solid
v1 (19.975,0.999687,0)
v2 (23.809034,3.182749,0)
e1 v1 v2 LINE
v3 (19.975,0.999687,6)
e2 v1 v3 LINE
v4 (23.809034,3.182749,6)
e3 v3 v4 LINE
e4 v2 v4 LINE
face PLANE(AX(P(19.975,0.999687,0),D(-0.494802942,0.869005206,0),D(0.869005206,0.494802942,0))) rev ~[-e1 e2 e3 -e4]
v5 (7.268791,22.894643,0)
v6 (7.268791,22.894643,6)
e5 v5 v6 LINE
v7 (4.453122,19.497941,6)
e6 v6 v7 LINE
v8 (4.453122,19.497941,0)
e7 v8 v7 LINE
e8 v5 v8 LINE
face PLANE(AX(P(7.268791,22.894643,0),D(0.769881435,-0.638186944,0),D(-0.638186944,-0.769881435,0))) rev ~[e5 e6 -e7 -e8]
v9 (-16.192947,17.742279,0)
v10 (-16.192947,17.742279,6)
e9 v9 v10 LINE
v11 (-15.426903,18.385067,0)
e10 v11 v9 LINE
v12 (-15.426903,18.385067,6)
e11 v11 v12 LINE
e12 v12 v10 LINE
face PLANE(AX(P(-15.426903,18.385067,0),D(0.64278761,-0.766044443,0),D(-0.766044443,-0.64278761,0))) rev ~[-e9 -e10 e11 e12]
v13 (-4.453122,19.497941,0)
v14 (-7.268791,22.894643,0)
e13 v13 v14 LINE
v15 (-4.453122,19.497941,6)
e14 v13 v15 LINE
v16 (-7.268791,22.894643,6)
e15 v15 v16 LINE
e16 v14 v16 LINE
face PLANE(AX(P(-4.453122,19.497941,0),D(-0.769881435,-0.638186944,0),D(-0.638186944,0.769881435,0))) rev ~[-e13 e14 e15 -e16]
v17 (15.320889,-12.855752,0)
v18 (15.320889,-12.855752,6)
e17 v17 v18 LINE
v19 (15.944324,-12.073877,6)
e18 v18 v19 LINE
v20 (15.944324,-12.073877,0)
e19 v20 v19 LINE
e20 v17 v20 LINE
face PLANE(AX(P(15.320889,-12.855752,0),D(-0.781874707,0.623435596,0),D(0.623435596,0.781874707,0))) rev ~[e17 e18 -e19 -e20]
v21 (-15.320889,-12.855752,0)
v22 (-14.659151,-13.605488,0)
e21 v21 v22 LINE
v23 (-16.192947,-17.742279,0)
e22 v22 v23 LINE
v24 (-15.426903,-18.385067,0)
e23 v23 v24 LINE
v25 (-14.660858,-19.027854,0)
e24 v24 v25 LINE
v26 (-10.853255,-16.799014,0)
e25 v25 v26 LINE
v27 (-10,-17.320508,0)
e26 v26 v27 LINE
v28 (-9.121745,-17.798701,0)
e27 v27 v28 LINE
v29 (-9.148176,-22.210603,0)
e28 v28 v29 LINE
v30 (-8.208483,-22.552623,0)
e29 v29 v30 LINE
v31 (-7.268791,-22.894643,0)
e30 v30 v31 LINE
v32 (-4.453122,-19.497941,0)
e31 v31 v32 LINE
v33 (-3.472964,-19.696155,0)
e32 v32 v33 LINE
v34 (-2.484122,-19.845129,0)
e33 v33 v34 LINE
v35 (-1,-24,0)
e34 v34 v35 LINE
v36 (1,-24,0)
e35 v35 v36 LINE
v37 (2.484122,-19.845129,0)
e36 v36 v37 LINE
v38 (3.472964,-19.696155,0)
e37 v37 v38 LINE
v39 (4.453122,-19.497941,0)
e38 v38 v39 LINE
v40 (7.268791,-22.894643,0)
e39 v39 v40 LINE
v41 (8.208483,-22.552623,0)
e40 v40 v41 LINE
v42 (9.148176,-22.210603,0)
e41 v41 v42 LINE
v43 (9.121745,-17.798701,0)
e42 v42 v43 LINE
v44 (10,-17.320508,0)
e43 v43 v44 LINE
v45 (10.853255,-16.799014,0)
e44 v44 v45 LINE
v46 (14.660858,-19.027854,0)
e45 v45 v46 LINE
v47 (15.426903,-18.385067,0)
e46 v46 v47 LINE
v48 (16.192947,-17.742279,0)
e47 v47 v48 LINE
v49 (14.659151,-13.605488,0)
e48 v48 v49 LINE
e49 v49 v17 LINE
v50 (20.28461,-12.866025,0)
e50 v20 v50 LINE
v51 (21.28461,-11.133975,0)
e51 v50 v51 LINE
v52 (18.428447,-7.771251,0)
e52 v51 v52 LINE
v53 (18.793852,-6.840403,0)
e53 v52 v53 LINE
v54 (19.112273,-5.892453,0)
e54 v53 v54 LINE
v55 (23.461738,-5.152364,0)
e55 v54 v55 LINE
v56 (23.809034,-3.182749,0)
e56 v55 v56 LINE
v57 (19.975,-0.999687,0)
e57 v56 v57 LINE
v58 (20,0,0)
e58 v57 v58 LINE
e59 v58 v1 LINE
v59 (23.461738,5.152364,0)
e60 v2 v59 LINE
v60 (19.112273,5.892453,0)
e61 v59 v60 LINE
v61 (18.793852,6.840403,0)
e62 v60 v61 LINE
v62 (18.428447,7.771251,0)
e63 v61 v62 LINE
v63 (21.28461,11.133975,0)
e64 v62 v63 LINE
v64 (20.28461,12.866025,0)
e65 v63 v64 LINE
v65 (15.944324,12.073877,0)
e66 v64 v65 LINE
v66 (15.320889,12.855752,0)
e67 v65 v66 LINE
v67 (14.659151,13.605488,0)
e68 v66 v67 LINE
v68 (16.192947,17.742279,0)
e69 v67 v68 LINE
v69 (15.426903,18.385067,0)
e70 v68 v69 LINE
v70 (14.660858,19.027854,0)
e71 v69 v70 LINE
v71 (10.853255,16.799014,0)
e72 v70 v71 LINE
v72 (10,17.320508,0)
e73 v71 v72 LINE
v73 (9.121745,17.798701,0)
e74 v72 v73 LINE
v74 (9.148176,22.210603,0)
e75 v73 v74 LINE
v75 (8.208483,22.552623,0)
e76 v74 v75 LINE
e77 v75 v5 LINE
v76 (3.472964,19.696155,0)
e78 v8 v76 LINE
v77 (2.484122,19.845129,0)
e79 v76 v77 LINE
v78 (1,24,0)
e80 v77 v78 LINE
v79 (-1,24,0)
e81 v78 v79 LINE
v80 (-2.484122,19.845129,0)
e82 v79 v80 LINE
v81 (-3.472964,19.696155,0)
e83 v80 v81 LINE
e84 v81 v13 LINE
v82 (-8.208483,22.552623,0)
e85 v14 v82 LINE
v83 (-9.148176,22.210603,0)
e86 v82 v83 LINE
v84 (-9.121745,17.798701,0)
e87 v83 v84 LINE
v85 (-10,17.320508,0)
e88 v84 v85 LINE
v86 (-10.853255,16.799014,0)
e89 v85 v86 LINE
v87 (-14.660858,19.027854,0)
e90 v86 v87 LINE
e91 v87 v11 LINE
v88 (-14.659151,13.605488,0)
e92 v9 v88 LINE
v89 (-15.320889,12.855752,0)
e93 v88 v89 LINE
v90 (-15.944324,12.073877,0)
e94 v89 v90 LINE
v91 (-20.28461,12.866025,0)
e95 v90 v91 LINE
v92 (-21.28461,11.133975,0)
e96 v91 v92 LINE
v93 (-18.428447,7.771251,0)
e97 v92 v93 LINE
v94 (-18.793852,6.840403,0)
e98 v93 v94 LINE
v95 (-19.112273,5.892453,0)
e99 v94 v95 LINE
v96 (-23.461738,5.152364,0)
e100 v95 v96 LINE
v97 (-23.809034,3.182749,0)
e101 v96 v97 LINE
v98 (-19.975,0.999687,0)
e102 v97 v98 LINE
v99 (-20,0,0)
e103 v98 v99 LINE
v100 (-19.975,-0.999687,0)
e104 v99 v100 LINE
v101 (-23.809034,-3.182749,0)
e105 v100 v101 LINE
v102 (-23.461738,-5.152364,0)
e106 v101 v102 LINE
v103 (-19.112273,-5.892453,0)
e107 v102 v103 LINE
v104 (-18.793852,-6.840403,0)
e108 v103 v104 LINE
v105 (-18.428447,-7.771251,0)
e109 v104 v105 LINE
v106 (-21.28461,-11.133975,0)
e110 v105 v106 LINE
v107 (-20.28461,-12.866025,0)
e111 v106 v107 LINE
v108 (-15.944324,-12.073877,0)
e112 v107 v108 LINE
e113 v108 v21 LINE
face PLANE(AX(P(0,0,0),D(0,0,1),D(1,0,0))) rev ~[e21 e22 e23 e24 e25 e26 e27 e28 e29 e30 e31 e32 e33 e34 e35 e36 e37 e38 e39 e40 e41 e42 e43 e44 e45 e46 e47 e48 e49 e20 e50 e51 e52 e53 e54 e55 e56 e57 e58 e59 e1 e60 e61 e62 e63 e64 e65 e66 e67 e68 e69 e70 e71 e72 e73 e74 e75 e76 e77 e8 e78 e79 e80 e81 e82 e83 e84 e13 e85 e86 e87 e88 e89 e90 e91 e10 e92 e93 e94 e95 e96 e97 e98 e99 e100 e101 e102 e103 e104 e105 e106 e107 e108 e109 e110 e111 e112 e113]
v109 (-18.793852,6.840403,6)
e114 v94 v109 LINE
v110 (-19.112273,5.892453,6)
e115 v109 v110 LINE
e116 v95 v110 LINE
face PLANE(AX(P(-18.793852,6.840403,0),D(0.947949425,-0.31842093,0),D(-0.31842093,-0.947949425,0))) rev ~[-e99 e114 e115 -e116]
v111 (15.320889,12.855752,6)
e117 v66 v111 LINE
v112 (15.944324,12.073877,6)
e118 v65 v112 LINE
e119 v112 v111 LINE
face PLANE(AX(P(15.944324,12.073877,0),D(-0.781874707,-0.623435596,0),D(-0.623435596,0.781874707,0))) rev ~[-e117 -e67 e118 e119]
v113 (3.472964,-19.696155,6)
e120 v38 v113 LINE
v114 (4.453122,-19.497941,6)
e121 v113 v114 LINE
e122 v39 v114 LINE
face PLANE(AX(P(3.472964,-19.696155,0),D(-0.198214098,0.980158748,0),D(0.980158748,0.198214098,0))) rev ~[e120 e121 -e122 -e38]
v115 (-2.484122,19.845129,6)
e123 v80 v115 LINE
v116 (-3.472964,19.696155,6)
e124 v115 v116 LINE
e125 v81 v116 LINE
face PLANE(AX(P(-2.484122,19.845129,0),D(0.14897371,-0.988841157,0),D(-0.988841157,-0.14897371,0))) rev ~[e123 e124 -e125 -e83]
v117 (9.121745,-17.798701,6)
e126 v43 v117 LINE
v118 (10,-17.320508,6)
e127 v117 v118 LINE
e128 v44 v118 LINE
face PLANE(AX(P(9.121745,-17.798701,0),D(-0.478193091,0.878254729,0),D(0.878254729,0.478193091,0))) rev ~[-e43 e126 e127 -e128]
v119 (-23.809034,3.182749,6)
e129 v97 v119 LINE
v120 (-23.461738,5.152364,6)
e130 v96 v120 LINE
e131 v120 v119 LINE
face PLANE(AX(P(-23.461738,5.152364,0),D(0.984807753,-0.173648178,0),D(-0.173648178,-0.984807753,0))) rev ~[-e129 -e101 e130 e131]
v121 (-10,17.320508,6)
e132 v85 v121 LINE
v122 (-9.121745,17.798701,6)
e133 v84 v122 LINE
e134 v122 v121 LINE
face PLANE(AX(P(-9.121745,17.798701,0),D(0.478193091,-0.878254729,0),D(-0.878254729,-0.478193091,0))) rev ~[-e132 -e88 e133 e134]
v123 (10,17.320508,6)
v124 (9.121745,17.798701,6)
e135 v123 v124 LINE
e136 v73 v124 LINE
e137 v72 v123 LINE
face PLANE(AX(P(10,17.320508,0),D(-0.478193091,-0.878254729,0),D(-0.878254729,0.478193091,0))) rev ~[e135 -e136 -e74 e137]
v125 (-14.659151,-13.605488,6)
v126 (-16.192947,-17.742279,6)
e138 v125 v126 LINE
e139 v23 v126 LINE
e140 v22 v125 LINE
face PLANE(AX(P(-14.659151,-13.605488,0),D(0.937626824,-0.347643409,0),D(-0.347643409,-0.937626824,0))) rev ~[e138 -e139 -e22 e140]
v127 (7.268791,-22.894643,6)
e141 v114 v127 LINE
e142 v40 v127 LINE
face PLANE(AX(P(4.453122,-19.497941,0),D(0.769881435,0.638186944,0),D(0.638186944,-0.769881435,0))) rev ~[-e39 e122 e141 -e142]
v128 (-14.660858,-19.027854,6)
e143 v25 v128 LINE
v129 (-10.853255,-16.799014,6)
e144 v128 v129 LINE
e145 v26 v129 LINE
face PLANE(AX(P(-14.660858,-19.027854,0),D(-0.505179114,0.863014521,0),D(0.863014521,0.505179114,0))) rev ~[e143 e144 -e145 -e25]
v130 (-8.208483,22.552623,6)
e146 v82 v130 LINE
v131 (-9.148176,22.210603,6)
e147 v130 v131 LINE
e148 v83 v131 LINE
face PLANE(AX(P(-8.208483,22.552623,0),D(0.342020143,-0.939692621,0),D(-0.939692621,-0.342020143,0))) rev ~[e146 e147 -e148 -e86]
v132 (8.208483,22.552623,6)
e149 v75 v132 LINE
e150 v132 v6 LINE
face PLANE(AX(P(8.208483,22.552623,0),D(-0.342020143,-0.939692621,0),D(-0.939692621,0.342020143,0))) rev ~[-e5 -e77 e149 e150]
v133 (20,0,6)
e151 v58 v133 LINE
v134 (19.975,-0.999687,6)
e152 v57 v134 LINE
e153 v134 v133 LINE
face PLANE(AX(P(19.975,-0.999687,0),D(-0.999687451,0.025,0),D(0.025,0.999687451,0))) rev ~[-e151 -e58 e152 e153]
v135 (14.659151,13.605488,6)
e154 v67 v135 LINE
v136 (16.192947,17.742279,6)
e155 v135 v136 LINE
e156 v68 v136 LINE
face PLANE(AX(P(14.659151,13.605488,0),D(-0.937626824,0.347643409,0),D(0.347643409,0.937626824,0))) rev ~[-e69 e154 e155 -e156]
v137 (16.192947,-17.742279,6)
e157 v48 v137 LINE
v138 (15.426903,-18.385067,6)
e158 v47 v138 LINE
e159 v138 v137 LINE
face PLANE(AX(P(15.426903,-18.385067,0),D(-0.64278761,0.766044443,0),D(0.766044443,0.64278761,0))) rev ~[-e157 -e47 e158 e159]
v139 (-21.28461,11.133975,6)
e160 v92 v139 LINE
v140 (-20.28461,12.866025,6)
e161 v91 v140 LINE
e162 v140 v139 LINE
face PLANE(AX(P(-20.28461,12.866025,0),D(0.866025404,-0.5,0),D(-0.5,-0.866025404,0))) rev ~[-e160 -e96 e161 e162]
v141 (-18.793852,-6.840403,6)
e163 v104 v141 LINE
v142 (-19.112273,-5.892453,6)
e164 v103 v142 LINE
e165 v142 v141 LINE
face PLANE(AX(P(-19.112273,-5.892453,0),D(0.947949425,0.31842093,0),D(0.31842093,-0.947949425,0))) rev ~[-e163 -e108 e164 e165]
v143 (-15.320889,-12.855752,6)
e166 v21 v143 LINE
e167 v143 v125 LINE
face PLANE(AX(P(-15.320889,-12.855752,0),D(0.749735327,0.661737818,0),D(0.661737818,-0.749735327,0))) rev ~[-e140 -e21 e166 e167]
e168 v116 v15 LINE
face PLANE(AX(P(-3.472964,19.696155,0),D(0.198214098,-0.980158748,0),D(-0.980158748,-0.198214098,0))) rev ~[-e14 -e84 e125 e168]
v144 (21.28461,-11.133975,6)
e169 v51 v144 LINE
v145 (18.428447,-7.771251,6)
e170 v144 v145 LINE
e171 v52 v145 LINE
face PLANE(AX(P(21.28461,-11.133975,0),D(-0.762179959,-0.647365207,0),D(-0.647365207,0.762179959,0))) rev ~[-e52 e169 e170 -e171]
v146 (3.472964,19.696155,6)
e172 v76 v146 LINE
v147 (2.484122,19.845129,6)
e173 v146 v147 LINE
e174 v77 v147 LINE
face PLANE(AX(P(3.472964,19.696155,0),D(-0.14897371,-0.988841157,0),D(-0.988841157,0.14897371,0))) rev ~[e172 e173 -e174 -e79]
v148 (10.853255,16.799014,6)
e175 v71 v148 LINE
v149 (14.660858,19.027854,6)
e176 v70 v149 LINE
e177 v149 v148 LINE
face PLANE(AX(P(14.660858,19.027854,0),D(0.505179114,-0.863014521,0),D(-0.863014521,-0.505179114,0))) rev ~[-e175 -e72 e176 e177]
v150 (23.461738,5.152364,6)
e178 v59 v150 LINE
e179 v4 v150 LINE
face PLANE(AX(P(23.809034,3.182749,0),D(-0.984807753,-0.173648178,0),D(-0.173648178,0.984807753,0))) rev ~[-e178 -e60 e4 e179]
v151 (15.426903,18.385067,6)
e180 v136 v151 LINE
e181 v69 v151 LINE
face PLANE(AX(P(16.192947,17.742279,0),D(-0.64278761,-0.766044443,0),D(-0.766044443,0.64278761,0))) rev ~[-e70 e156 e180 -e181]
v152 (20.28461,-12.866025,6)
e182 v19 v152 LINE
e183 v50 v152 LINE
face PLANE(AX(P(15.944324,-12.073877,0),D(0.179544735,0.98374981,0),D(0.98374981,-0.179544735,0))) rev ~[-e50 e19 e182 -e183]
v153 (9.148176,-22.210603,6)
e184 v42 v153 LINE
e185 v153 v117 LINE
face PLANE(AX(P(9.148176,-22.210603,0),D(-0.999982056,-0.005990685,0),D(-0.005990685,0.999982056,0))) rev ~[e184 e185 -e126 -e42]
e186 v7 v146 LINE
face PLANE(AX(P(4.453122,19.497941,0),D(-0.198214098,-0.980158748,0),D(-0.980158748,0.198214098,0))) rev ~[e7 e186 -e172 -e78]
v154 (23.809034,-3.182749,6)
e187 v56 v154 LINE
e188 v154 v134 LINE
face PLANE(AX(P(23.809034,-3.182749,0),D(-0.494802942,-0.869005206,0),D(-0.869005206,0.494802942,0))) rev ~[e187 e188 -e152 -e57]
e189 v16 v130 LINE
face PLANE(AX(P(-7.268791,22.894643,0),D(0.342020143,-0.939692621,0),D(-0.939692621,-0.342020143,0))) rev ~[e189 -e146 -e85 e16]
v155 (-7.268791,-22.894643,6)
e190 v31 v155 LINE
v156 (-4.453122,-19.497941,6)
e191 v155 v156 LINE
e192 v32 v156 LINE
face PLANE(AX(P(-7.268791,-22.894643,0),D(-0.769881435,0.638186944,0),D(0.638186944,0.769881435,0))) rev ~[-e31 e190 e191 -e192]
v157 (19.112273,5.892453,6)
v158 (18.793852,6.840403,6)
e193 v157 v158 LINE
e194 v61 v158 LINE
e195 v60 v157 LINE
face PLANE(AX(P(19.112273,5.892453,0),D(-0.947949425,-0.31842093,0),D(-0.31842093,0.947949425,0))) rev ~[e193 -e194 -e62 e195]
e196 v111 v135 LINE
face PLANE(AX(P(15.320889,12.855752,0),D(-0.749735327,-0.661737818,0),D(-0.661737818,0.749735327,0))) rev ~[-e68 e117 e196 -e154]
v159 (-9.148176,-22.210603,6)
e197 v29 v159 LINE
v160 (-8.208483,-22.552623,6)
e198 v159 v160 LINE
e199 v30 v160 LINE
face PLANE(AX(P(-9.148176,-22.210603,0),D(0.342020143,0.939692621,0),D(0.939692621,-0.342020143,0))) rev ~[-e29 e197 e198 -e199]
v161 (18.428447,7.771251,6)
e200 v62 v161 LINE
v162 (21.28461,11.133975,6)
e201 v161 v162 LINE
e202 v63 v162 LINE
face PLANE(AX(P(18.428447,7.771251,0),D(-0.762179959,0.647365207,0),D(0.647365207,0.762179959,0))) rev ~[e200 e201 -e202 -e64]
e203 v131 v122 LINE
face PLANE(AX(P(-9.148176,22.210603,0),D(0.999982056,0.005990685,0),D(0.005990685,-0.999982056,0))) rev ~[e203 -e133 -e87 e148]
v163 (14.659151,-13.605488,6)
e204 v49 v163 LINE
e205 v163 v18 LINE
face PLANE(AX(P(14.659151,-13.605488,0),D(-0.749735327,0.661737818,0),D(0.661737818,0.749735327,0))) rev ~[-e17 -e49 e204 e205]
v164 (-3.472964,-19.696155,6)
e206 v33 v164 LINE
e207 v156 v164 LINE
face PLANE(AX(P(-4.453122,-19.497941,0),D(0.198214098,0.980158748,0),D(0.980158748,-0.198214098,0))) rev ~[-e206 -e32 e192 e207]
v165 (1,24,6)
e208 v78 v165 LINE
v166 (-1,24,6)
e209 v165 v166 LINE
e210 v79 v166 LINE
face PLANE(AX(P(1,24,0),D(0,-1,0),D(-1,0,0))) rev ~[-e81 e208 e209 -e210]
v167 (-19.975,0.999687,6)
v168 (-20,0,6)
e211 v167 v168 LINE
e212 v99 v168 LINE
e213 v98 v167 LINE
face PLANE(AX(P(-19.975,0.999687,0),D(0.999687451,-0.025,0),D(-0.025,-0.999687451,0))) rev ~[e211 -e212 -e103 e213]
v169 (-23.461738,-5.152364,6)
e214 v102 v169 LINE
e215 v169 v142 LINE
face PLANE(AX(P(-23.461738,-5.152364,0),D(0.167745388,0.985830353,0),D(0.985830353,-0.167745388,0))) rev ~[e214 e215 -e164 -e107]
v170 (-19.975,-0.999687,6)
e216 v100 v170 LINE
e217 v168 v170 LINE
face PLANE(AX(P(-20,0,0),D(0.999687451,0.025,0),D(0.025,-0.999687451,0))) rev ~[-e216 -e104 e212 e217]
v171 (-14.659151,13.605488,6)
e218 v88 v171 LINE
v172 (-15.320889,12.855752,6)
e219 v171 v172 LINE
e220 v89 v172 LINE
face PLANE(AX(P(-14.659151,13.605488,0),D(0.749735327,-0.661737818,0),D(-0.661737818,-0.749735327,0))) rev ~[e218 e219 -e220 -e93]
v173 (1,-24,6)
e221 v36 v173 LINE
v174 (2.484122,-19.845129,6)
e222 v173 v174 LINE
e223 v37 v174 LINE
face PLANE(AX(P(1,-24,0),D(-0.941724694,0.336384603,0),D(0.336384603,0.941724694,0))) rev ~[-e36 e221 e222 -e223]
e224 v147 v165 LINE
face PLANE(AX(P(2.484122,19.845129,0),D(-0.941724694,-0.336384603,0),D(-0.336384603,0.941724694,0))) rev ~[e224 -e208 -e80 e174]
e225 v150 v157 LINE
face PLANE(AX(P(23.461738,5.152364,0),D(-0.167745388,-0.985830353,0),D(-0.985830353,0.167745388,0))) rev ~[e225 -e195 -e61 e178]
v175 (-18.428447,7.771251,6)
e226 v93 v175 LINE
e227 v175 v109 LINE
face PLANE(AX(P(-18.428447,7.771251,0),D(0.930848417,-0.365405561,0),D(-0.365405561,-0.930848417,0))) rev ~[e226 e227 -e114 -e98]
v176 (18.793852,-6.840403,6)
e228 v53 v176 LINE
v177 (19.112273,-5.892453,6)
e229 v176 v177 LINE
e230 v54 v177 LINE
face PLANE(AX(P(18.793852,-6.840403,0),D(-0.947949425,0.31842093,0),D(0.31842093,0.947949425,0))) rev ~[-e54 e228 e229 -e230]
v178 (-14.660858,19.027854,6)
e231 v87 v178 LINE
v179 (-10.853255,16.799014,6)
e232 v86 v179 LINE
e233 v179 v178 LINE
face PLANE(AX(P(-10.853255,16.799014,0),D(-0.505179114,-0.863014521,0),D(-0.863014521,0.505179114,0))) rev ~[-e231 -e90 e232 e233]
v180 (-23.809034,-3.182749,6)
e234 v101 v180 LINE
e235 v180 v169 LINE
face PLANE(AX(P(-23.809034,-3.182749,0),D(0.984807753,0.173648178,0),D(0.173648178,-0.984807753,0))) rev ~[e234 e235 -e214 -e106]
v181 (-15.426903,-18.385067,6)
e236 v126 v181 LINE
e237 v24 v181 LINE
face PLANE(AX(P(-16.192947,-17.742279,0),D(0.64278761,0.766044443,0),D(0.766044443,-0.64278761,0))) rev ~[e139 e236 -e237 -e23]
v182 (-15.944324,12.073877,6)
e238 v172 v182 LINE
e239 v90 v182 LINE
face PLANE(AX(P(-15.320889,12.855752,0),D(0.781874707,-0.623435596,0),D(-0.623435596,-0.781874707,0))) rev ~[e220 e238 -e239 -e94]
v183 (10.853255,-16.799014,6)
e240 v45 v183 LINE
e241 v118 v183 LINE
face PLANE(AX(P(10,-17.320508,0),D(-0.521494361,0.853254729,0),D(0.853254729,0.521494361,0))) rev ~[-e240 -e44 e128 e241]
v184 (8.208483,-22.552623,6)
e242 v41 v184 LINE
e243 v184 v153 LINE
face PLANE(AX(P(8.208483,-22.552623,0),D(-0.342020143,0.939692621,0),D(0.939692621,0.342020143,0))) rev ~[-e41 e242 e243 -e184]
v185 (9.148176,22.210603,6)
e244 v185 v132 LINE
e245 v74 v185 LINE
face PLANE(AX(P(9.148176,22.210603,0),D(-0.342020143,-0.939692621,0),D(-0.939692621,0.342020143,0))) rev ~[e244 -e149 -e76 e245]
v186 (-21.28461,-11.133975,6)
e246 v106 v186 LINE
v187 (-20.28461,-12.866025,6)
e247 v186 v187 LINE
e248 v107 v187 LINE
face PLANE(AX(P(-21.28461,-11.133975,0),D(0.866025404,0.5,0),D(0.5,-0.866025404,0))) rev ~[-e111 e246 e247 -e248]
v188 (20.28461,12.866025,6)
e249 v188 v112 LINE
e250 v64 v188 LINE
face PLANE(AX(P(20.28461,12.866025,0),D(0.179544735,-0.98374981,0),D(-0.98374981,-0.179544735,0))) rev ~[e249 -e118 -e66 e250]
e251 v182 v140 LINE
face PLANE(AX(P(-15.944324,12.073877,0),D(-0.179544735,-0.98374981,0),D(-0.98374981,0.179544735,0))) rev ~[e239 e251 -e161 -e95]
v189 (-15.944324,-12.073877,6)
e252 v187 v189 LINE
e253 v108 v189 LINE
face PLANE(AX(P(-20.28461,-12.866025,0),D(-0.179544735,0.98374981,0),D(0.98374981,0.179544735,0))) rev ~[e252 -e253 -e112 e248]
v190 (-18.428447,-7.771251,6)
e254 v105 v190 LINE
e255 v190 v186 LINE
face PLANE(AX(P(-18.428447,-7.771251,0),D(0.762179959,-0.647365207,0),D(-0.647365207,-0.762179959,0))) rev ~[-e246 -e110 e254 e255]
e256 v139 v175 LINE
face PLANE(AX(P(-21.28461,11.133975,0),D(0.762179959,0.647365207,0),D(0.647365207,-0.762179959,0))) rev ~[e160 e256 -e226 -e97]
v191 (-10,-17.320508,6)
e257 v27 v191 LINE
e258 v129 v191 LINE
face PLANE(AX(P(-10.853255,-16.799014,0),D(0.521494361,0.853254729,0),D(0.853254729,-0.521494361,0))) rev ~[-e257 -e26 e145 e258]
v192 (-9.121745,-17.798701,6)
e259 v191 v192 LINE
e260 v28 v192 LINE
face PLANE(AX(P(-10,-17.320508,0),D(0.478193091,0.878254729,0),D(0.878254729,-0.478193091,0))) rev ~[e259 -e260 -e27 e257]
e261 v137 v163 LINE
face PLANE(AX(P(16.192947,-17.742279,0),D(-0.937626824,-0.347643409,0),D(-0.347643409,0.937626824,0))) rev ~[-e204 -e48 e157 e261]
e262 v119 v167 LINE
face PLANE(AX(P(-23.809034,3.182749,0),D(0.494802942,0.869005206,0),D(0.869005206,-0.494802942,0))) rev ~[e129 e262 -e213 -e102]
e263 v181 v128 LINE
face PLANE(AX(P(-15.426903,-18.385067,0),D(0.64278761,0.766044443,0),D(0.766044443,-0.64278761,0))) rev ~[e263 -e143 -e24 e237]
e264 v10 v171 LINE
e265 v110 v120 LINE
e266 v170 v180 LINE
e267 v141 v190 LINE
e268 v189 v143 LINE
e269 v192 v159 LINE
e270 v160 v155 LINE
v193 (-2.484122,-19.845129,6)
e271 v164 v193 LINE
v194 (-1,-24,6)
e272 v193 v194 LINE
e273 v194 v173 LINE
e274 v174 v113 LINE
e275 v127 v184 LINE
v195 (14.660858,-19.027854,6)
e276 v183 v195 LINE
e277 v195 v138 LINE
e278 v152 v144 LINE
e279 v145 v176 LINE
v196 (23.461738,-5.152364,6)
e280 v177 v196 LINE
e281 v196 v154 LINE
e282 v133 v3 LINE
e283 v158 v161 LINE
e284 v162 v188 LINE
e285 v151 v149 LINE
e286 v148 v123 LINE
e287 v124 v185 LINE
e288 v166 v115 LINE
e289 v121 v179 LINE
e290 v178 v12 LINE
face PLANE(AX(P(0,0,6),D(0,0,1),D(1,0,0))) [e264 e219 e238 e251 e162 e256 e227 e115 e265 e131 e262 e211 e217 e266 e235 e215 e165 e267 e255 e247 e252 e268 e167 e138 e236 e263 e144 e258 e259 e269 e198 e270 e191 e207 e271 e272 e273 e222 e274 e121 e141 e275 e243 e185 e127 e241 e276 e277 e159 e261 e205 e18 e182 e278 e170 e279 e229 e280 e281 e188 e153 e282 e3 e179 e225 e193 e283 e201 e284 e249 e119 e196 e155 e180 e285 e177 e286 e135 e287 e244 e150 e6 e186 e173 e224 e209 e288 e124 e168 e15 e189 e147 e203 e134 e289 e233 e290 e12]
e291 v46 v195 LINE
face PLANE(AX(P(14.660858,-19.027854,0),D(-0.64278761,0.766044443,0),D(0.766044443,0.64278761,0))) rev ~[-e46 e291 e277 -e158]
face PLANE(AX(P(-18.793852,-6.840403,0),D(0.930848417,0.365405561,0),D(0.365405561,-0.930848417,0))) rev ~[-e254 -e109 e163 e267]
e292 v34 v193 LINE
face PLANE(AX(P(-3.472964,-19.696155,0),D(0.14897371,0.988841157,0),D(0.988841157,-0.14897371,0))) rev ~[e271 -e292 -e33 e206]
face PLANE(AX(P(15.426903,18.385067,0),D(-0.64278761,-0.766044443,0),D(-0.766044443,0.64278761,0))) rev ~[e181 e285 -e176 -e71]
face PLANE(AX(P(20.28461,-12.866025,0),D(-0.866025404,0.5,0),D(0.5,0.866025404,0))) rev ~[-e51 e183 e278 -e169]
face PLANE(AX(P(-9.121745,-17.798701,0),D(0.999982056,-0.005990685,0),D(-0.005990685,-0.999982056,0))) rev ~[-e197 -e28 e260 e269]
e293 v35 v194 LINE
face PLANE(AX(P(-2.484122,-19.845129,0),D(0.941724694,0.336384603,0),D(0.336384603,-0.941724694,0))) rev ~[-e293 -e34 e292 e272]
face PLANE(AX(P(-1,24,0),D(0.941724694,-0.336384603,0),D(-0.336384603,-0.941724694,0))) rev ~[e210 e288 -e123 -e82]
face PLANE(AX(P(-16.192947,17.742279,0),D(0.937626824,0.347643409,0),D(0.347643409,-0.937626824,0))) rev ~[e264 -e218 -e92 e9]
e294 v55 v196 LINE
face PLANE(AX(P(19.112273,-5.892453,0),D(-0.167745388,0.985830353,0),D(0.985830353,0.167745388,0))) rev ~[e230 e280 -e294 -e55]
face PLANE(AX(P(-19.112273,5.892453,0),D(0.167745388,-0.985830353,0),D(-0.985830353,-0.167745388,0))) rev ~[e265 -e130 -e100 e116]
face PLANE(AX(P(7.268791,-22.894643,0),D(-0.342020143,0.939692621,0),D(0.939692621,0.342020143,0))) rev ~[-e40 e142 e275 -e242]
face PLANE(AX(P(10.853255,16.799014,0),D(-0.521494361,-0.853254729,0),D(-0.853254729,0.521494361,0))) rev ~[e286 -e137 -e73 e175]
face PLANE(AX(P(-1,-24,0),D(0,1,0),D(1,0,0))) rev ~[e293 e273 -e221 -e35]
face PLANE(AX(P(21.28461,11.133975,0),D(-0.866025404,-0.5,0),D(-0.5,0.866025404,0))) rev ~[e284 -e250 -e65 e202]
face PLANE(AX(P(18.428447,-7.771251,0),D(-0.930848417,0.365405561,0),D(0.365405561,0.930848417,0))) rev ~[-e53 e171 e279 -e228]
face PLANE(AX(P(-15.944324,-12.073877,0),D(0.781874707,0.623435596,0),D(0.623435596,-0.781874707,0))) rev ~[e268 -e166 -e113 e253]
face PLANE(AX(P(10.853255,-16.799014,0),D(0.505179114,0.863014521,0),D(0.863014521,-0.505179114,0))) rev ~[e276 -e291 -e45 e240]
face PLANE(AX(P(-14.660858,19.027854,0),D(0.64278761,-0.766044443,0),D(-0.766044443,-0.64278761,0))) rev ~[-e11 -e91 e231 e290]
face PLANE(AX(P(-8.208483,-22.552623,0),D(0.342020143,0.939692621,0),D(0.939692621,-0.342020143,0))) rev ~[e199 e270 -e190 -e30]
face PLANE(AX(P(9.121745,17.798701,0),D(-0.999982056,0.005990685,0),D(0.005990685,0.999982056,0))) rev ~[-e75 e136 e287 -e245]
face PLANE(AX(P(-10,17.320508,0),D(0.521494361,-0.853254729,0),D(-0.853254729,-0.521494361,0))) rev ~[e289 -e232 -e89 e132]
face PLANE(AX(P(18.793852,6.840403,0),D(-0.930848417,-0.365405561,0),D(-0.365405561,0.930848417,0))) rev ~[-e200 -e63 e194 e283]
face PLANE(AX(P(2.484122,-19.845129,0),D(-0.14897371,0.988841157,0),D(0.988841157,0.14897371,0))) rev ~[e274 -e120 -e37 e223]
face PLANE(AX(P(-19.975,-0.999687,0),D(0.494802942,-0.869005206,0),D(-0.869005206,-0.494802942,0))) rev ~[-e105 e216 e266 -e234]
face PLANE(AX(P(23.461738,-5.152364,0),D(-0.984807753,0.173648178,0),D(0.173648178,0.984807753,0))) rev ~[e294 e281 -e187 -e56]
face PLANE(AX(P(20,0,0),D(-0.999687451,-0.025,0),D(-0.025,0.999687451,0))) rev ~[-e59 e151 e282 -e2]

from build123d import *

# Parameters (mm, degrees)
F1_DEPTH = 6


# Not quite as in the source:
# - a feature names something its author has since deleted; it is built from what else it names


with BuildPart() as f1:
    # F0 (on Top) → F1 (new body)
    with BuildSketch(Plane.XY):
        with BuildLine():
            Line((19.975, -0.9996874512), (20, 0))
            Line((20, 0), (19.975, 0.9996874512))
            ThreePointArc((19.975, 0.9996874512), (19.6961550602, 3.4729635533), (19.1122733455, 5.892453442))
            Line((19.1122733455, 5.892453442), (18.7938524157, 6.8404028665))
            Line((18.7938524157, 6.8404028665), (18.4284468549, 7.7712512839))
            ThreePointArc((18.4284468549, 7.7712512839), (17.3205080757, 10), (15.9443244585, 12.0738774867))
            Line((15.9443244585, 12.0738774867), (15.3208888624, 12.8557521937))
            Line((15.3208888624, 12.8557521937), (14.6591510441, 13.6054875203))
            ThreePointArc((14.6591510441, 13.6054875203), (12.8557521937, 15.3208888624), (10.8532547285, 16.799013715))
            Line((10.8532547285, 16.799013715), (10, 17.3205080757))
            Line((10, 17.3205080757), (9.1217452715, 17.7987011662))
            ThreePointArc((9.1217452715, 17.7987011662), (6.8404028665, 18.7938524157), (4.4531223014, 19.4979409623))
            Line((4.4531223014, 19.4979409623), (3.4729635533, 19.6961550602))
            Line((3.4729635533, 19.6961550602), (2.4841223964, 19.8451287705))
            ThreePointArc((2.4841223964, 19.8451287705), (0, 20), (-2.4841223964, 19.8451287705))
            Line((-2.4841223964, 19.8451287705), (-3.4729635533, 19.6961550602))
            Line((-3.4729635533, 19.6961550602), (-4.4531223014, 19.4979409623))
            ThreePointArc((-4.4531223014, 19.4979409623), (-6.8404028665, 18.7938524157), (-9.1217452715, 17.7987011662))
            Line((-9.1217452715, 17.7987011662), (-10, 17.3205080757))
            Line((-10, 17.3205080757), (-10.8532547285, 16.799013715))
            ThreePointArc((-10.8532547285, 16.799013715), (-12.8557521937, 15.3208888624), (-14.6591510441, 13.6054875203))
            Line((-14.6591510441, 13.6054875203), (-15.3208888624, 12.8557521937))
            Line((-15.3208888624, 12.8557521937), (-15.9443244585, 12.0738774867))
            ThreePointArc((-15.9443244585, 12.0738774867), (-17.3205080757, 10), (-18.4284468549, 7.7712512839))
            Line((-18.4284468549, 7.7712512839), (-18.7938524157, 6.8404028665))
            Line((-18.7938524157, 6.8404028665), (-19.1122733455, 5.892453442))
            ThreePointArc((-19.1122733455, 5.892453442), (-19.6961550602, 3.4729635533), (-19.975, 0.9996874512))
            Line((-19.975, 0.9996874512), (-20, 0))
            Line((-20, 0), (-19.975, -0.9996874512))
            ThreePointArc((-19.975, -0.9996874512), (-19.6961550602, -3.4729635533), (-19.1122733455, -5.892453442))
            Line((-19.1122733455, -5.892453442), (-18.7938524157, -6.8404028665))
            Line((-18.7938524157, -6.8404028665), (-18.4284468549, -7.7712512839))
            ThreePointArc((-18.4284468549, -7.7712512839), (-17.3205080757, -10), (-15.9443244585, -12.0738774867))
            Line((-15.9443244585, -12.0738774867), (-15.3208888624, -12.8557521937))
            Line((-15.3208888624, -12.8557521937), (-14.6591510441, -13.6054875203))
            ThreePointArc((-14.6591510441, -13.6054875203), (-12.8557521937, -15.3208888624), (-10.8532547285, -16.799013715))
            Line((-10.8532547285, -16.799013715), (-10, -17.3205080757))
            Line((-10, -17.3205080757), (-9.1217452715, -17.7987011662))
            ThreePointArc((-9.1217452715, -17.7987011662), (-6.8404028665, -18.7938524157), (-4.4531223014, -19.4979409623))
            Line((-4.4531223014, -19.4979409623), (-3.4729635533, -19.6961550602))
            Line((-3.4729635533, -19.6961550602), (-2.4841223964, -19.8451287705))
            ThreePointArc((-2.4841223964, -19.8451287705), (0, -20), (2.4841223964, -19.8451287705))
            Line((2.4841223964, -19.8451287705), (3.4729635533, -19.6961550602))
            Line((3.4729635533, -19.6961550602), (4.4531223014, -19.4979409623))
            ThreePointArc((4.4531223014, -19.4979409623), (6.8404028665, -18.7938524157), (9.1217452715, -17.7987011662))
            Line((9.1217452715, -17.7987011662), (10, -17.3205080757))
            Line((10, -17.3205080757), (10.8532547285, -16.799013715))
            ThreePointArc((10.8532547285, -16.799013715), (12.8557521937, -15.3208888624), (14.6591510441, -13.6054875203))
            Line((14.6591510441, -13.6054875203), (15.3208888624, -12.8557521937))
            Line((15.3208888624, -12.8557521937), (15.9443244585, -12.0738774867))
            ThreePointArc((15.9443244585, -12.0738774867), (17.3205080757, -10), (18.4284468549, -7.7712512839))
            Line((18.4284468549, -7.7712512839), (18.7938524157, -6.8404028665))
            Line((18.7938524157, -6.8404028665), (19.1122733455, -5.892453442))
            ThreePointArc((19.1122733455, -5.892453442), (19.6961550602, -3.4729635533), (19.975, -0.9996874512))
        make_face()
        with BuildLine():
            ThreePointArc((-2.4841223964, 19.8451287705), (0, 20), (2.4841223964, 19.8451287705))
            Line((2.4841223964, 19.8451287705), (1, 24))
            Line((1, 24), (0, 24))
            Line((0, 24), (-1, 24))
            Line((-1, 24), (-2.4841223964, 19.8451287705))
        make_face()
        with BuildLine():
            ThreePointArc((4.4531223014, 19.4979409623), (6.8404028665, 18.7938524157), (9.1217452715, 17.7987011662))
            Line((9.1217452715, 17.7987011662), (9.1481760606, 22.2106027555))
            Line((9.1481760606, 22.2106027555), (8.2084834398, 22.5526228989))
            Line((8.2084834398, 22.5526228989), (7.268790819, 22.8946430422))
            Line((7.268790819, 22.8946430422), (4.4531223014, 19.4979409623))
        make_face()
        with BuildLine():
            ThreePointArc((10.8532547285, 16.799013715), (12.8557521937, 15.3208888624), (14.6591510441, 13.6054875203))
            Line((14.6591510441, 13.6054875203), (16.1929470756, 17.7422790252))
            Line((16.1929470756, 17.7422790252), (15.4269026325, 18.3850666349))
            Line((15.4269026325, 18.3850666349), (14.6608581894, 19.0278542445))
            Line((14.6608581894, 19.0278542445), (10.8532547285, 16.799013715))
        make_face()
        with BuildLine():
            ThreePointArc((15.9443244585, 12.0738774867), (17.3205080757, 10), (18.4284468549, 7.7712512839))
            Line((18.4284468549, 7.7712512839), (21.2846096908, 11.1339745962))
            Line((21.2846096908, 11.1339745962), (20.7846096908, 12))
            Line((20.7846096908, 12), (20.2846096908, 12.8660254038))
            Line((20.2846096908, 12.8660254038), (15.9443244585, 12.0738774867))
        make_face()
        with BuildLine():
            ThreePointArc((19.1122733455, 5.892453442), (19.6961550602, 3.4729635533), (19.975, 0.9996874512))
            Line((19.975, 0.9996874512), (23.80903425, 3.182748511))
            Line((23.80903425, 3.182748511), (23.6353860723, 4.167556264))
            Line((23.6353860723, 4.167556264), (23.4617378946, 5.152364017))
            Line((23.4617378946, 5.152364017), (19.1122733455, 5.892453442))
        make_face()
        with BuildLine():
            Line((23.80903425, -3.182748511), (19.975, -0.9996874512))
            ThreePointArc((19.975, -0.9996874512), (19.6961550602, -3.4729635533), (19.1122733455, -5.892453442))
            Line((19.1122733455, -5.892453442), (23.4617378946, -5.152364017))
            Line((23.4617378946, -5.152364017), (23.6353860723, -4.167556264))
            Line((23.6353860723, -4.167556264), (23.80903425, -3.182748511))
        make_face()
        with BuildLine():
            Line((21.2846096908, -11.1339745962), (18.4284468549, -7.7712512839))
            ThreePointArc((18.4284468549, -7.7712512839), (17.3205080757, -10), (15.9443244585, -12.0738774867))
            Line((15.9443244585, -12.0738774867), (20.2846096908, -12.8660254038))
            Line((20.2846096908, -12.8660254038), (20.7846096908, -12))
            Line((20.7846096908, -12), (21.2846096908, -11.1339745962))
        make_face()
        with BuildLine():
            Line((16.1929470756, -17.7422790252), (14.6591510441, -13.6054875203))
            ThreePointArc((14.6591510441, -13.6054875203), (12.8557521937, -15.3208888624), (10.8532547285, -16.799013715))
            Line((10.8532547285, -16.799013715), (14.6608581894, -19.0278542445))
            Line((14.6608581894, -19.0278542445), (15.4269026325, -18.3850666349))
            Line((15.4269026325, -18.3850666349), (16.1929470756, -17.7422790252))
        make_face()
        with BuildLine():
            Line((9.1481760606, -22.2106027555), (9.1217452715, -17.7987011662))
            ThreePointArc((9.1217452715, -17.7987011662), (6.8404028665, -18.7938524157), (4.4531223014, -19.4979409623))
            Line((4.4531223014, -19.4979409623), (7.268790819, -22.8946430422))
            Line((7.268790819, -22.8946430422), (8.2084834398, -22.5526228989))
            Line((8.2084834398, -22.5526228989), (9.1481760606, -22.2106027555))
        make_face()
        with BuildLine():
            Line((1, -24), (2.4841223964, -19.8451287705))
            ThreePointArc((2.4841223964, -19.8451287705), (0, -20), (-2.4841223964, -19.8451287705))
            Line((-2.4841223964, -19.8451287705), (-1, -24))
            Line((-1, -24), (0, -24))
            Line((0, -24), (1, -24))
        make_face()
        with BuildLine():
            Line((-7.268790819, -22.8946430422), (-4.4531223014, -19.4979409623))
            ThreePointArc((-4.4531223014, -19.4979409623), (-6.8404028665, -18.7938524157), (-9.1217452715, -17.7987011662))
            Line((-9.1217452715, -17.7987011662), (-9.1481760606, -22.2106027555))
            Line((-9.1481760606, -22.2106027555), (-8.2084834398, -22.5526228989))
            Line((-8.2084834398, -22.5526228989), (-7.268790819, -22.8946430422))
        make_face()
        with BuildLine():
            Line((-14.6608581894, -19.0278542445), (-10.8532547285, -16.799013715))
            ThreePointArc((-10.8532547285, -16.799013715), (-12.8557521937, -15.3208888624), (-14.6591510441, -13.6054875203))
            Line((-14.6591510441, -13.6054875203), (-16.1929470756, -17.7422790252))
            Line((-16.1929470756, -17.7422790252), (-15.4269026325, -18.3850666349))
            Line((-15.4269026325, -18.3850666349), (-14.6608581894, -19.0278542445))
        make_face()
        with BuildLine():
            Line((-20.2846096908, -12.8660254038), (-15.9443244585, -12.0738774867))
            ThreePointArc((-15.9443244585, -12.0738774867), (-17.3205080757, -10), (-18.4284468549, -7.7712512839))
            Line((-18.4284468549, -7.7712512839), (-21.2846096908, -11.1339745962))
            Line((-21.2846096908, -11.1339745962), (-20.7846096908, -12))
            Line((-20.7846096908, -12), (-20.2846096908, -12.8660254038))
        make_face()
        with BuildLine():
            Line((-23.4617378946, -5.152364017), (-19.1122733455, -5.892453442))
            ThreePointArc((-19.1122733455, -5.892453442), (-19.6961550602, -3.4729635533), (-19.975, -0.9996874512))
            Line((-19.975, -0.9996874512), (-23.80903425, -3.182748511))
            Line((-23.80903425, -3.182748511), (-23.6353860723, -4.167556264))
            Line((-23.6353860723, -4.167556264), (-23.4617378946, -5.152364017))
        make_face()
        with BuildLine():
            ThreePointArc((-19.975, 0.9996874512), (-19.6961550602, 3.4729635533), (-19.1122733455, 5.892453442))
            Line((-19.1122733455, 5.892453442), (-23.4617378946, 5.152364017))
            Line((-23.4617378946, 5.152364017), (-23.6353860723, 4.167556264))
            Line((-23.6353860723, 4.167556264), (-23.80903425, 3.182748511))
            Line((-23.80903425, 3.182748511), (-19.975, 0.9996874512))
        make_face()
        with BuildLine():
            ThreePointArc((-18.4284468549, 7.7712512839), (-17.3205080757, 10), (-15.9443244585, 12.0738774867))
            Line((-15.9443244585, 12.0738774867), (-20.2846096908, 12.8660254038))
            Line((-20.2846096908, 12.8660254038), (-20.7846096908, 12))
            Line((-20.7846096908, 12), (-21.2846096908, 11.1339745962))
            Line((-21.2846096908, 11.1339745962), (-18.4284468549, 7.7712512839))
        make_face()
        with BuildLine():
            ThreePointArc((-14.6591510441, 13.6054875203), (-12.8557521937, 15.3208888624), (-10.8532547285, 16.799013715))
            Line((-10.8532547285, 16.799013715), (-14.6608581894, 19.0278542445))
            Line((-14.6608581894, 19.0278542445), (-15.4269026325, 18.3850666349))
            Line((-15.4269026325, 18.3850666349), (-16.1929470756, 17.7422790252))
            Line((-16.1929470756, 17.7422790252), (-14.6591510441, 13.6054875203))
        make_face()
        with BuildLine():
            ThreePointArc((-9.1217452715, 17.7987011662), (-6.8404028665, 18.7938524157), (-4.4531223014, 19.4979409623))
            Line((-4.4531223014, 19.4979409623), (-7.268790819, 22.8946430422))
            Line((-7.268790819, 22.8946430422), (-8.2084834398, 22.5526228989))
            Line((-8.2084834398, 22.5526228989), (-9.1481760606, 22.2106027555))
            Line((-9.1481760606, 22.2106027555), (-9.1217452715, 17.7987011662))
        make_face()
    extrude(amount=F1_DEPTH)


solid = f1.part
